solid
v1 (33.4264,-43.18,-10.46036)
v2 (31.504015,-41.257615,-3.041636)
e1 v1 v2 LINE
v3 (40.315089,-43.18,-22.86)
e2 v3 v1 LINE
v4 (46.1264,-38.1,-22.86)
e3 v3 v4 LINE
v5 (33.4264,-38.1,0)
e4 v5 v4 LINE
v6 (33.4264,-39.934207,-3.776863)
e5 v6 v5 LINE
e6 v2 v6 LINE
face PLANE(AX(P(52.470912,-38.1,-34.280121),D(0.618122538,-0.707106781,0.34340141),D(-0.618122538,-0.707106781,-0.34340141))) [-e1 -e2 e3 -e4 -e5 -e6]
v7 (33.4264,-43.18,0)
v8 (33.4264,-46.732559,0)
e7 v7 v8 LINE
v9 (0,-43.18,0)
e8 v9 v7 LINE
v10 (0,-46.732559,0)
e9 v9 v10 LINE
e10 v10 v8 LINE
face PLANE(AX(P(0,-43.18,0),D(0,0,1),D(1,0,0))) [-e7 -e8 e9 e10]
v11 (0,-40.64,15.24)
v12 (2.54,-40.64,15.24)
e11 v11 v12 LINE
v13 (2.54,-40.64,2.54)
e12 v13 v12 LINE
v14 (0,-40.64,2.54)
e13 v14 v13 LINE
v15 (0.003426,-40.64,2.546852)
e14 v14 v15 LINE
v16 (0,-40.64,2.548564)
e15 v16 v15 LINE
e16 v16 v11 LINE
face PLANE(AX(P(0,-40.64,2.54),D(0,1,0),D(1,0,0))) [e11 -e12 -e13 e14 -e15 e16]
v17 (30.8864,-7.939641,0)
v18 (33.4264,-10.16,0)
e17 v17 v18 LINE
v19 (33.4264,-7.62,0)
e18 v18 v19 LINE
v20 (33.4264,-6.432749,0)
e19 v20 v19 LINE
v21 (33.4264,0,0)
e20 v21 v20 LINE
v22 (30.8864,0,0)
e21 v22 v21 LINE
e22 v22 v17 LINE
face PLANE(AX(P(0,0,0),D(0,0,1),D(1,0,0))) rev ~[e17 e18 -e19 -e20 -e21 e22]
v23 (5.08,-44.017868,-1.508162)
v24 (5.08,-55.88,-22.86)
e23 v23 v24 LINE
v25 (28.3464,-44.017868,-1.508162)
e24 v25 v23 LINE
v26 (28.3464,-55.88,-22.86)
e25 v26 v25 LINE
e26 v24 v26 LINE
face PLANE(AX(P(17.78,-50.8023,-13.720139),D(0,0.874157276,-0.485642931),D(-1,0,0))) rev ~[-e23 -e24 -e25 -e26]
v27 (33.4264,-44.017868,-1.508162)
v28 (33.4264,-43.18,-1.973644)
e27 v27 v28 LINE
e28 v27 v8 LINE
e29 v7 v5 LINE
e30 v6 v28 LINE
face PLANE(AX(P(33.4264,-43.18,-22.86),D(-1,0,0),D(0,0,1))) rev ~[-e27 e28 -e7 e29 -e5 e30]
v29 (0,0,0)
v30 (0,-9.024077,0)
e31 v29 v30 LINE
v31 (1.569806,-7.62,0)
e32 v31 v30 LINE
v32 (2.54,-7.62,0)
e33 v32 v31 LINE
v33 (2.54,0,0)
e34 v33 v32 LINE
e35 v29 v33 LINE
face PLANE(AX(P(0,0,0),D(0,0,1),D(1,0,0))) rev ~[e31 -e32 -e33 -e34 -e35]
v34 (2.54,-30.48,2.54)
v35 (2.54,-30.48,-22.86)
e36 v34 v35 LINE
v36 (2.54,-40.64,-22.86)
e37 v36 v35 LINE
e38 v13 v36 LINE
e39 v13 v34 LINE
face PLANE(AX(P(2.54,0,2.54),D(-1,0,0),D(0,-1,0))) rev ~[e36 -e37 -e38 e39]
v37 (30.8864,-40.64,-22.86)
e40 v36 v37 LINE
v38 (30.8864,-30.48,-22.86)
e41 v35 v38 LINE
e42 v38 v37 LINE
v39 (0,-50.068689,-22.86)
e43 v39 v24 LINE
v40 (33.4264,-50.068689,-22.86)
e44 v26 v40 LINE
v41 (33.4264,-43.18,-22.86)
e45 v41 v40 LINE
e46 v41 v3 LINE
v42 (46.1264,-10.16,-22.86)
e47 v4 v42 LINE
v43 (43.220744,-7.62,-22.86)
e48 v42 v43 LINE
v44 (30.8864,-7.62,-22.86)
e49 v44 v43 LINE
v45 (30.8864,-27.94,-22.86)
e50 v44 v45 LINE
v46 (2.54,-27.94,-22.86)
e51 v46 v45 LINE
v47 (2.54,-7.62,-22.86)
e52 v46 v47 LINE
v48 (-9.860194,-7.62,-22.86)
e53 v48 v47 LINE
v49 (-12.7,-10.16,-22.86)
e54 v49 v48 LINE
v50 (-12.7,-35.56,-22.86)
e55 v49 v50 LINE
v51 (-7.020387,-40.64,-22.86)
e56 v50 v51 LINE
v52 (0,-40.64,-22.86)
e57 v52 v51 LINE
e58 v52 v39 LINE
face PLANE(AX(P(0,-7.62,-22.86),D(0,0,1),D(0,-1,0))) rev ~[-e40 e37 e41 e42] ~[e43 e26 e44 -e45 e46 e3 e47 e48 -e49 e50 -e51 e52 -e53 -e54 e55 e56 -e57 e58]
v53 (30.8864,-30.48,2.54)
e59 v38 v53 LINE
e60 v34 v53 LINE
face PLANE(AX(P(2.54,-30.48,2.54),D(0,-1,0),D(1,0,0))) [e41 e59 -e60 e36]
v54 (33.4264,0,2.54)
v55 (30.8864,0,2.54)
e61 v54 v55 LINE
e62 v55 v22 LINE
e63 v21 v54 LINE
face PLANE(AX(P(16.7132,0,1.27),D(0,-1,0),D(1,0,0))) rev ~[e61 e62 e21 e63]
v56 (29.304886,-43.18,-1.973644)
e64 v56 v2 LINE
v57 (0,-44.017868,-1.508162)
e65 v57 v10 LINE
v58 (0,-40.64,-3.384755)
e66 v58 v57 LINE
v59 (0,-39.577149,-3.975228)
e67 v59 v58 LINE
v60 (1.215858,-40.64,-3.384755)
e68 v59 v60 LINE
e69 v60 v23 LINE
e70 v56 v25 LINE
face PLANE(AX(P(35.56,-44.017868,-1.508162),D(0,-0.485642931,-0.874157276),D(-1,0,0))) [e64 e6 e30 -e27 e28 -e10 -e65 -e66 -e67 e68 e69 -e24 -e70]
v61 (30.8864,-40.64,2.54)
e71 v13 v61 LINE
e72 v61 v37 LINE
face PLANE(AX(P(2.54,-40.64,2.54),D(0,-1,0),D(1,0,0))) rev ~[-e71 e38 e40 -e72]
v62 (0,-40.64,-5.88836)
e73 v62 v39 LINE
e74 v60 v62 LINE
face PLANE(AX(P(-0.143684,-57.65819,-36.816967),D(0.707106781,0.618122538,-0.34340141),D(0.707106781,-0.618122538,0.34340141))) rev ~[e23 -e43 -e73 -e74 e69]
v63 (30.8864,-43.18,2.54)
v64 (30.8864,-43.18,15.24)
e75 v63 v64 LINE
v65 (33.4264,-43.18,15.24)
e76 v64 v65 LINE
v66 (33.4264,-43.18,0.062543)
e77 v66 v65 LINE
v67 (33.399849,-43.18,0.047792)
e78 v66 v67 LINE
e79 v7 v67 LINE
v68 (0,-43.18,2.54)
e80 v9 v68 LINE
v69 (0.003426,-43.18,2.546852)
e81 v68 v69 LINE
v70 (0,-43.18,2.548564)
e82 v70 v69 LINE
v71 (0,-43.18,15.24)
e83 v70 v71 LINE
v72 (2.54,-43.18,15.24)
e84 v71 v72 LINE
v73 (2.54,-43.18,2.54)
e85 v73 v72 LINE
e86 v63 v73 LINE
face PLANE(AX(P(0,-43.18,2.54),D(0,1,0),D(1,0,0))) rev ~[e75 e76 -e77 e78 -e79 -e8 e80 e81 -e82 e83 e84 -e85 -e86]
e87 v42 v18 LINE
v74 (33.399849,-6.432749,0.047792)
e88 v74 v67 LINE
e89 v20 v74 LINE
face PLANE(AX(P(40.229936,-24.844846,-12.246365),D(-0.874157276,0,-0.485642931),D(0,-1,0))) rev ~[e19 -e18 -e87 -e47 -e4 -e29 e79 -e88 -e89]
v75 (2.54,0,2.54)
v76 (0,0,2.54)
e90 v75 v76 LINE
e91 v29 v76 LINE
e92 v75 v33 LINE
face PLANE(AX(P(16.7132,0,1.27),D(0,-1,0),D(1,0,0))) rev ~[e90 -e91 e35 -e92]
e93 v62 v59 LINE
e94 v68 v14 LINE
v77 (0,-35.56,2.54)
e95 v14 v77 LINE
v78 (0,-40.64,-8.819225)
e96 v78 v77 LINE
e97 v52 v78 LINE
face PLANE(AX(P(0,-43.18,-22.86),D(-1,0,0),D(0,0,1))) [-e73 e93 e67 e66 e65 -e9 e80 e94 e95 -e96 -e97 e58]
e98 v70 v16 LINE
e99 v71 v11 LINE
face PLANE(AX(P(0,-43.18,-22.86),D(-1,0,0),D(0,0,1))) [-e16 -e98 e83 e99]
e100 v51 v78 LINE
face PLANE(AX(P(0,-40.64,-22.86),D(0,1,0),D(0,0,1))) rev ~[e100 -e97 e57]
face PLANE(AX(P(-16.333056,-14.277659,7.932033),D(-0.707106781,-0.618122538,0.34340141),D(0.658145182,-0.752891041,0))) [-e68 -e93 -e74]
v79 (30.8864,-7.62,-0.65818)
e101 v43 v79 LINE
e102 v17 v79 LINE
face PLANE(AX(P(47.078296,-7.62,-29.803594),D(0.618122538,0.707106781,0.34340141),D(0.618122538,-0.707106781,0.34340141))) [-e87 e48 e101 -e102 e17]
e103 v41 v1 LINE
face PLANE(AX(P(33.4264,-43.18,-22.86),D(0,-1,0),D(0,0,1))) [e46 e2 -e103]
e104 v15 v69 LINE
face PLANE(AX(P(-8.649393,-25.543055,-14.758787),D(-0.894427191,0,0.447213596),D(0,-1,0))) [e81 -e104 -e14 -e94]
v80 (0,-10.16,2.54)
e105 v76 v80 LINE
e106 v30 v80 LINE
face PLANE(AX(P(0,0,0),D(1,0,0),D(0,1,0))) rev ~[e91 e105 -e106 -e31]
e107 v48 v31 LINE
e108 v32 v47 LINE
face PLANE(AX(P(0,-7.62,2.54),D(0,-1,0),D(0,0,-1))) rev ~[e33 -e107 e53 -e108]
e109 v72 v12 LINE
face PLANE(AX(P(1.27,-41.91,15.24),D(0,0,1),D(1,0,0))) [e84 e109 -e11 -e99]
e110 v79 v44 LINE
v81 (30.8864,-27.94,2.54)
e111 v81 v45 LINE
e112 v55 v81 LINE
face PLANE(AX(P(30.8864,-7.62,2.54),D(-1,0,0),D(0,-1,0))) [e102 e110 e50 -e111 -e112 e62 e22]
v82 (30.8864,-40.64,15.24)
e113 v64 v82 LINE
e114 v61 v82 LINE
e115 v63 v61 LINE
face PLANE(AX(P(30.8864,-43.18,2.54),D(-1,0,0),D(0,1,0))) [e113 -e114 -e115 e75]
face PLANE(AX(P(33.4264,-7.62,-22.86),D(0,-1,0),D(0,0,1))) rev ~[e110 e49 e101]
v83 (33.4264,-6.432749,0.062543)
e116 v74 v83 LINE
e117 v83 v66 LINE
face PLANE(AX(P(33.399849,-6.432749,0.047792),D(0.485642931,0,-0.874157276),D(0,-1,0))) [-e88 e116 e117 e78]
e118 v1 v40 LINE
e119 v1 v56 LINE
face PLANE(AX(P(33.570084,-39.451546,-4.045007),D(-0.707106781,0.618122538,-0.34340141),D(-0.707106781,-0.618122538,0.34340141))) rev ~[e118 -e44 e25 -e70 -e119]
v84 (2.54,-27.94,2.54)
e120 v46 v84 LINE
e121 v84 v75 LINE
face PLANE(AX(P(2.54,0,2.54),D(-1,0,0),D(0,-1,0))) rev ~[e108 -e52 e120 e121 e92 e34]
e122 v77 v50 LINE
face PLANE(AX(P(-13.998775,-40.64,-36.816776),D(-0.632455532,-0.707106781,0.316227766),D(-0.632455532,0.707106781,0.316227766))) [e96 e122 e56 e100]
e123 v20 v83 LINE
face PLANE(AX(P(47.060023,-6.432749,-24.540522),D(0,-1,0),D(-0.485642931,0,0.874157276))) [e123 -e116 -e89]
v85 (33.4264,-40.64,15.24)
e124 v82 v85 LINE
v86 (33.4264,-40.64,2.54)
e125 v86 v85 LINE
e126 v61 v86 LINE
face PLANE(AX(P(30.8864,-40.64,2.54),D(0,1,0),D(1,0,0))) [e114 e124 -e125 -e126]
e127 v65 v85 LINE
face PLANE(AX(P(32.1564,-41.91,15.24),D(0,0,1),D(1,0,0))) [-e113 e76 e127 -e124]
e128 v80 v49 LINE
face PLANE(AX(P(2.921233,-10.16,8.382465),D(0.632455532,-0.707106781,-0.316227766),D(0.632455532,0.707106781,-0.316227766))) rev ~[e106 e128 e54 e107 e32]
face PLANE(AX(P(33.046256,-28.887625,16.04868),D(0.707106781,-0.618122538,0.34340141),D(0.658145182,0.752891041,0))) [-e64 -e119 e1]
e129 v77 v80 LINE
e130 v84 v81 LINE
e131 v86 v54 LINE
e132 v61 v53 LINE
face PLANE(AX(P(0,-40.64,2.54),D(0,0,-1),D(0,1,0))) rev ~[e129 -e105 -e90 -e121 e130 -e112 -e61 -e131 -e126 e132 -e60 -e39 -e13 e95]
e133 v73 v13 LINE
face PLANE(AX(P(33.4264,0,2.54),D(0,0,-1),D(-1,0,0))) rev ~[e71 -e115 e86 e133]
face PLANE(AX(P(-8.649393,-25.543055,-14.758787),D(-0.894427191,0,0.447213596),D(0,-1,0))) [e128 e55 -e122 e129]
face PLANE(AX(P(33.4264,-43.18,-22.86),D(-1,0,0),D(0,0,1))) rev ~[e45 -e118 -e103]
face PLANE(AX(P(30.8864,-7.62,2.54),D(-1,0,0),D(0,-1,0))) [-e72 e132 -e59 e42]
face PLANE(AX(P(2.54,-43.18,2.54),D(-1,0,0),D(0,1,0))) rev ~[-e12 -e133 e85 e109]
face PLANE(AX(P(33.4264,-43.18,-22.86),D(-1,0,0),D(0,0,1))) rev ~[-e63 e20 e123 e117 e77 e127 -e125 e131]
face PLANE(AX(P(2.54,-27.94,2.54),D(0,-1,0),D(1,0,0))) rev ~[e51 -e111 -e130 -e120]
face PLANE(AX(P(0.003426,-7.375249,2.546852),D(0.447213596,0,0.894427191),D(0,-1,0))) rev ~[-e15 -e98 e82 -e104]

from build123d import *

# Parameters (mm, degrees)
F0_W          = 28.3464
F0_H          = 2.54
F0_W_2        = 2.54
F1_DEPTH      = 43.18
F2_W          = 28.3464
F2_H          = 10.16
F3_DEPTH      = 2.54
F2_W_2        = 2.54
F2_H_2        = 2.54
F4_DEPTH      = 12.7
F5_DEPTH      = 25.4
F6_W          = 33.4264
F6_H          = 22.86
F7_DEPTH      = 12.7
F9_W          = 35.56
F9_H          = 27.94
F10_DEPTH     = 25.4
F11_W         = 35.56
F11_H         = 22.86
F12_DEPTH     = 12.7
F14_W         = 36.8241928518
F14_H         = 28.1280204654
F15_DEPTH     = 25.4
F17_DEPTH     = 12.7
F19_W         = 36.3356121816
F19_H         = 38.6965835933
F20_DEPTH     = 25.4
F21_T4_DEPTH  = 37.4897748093
F21_T10_DEPTH = 37.4897748093
F22_T4_DEPTH  = 41.4622128931
F22_T9_DEPTH  = 41.4622128931
F22_T15_DEPTH = 39.215050137
F22_T21_DEPTH = 39.215050137
F22_T26_DEPTH = 13.1188216118
F23_T4_DEPTH  = 41.4622128931
F23_T9_DEPTH  = 41.4622128931
F23_T14_DEPTH = 39.215050137
F24_W         = 28.3464
F24_H         = 2.54
F25_DEPTH     = 25.4


# Not quite as in the source:
# - a fillet or chamfer that OpenCascade refuses, or shapes differently, is made with other operations: its cross-section is extruded or revolved along the edge and cut away or added


with BuildPart() as f1:
    # F0 (on Front) → F1 (new body)
    with BuildSketch(Plane.XZ):
        with Locations((16.7132, 1.27)):
            Rectangle(F0_W, F0_H)
        with Locations((1.27, 1.27)):
            Rectangle(F0_W_2, F0_H)
        with Locations((32.1564, 1.27)):
            Rectangle(F0_W_2, F0_H)
    extrude(amount=F1_DEPTH)

    # F2 (on face) → F3 (cut)
    with BuildSketch(Plane.XY.offset(2.54)):
        Polygon((30.8864, 0), (2.54, 0), (2.54, -7.62), (2.54, -27.94), (30.8864, -27.94), (30.8864, -7.62), align=None)
        with Locations((16.7132, -35.56)):
            Rectangle(F2_W, F2_H)
    extrude(amount=-F3_DEPTH, mode=Mode.SUBTRACT)

    # F2 (on face) → F4 (join)
    with BuildSketch(Plane.XY.offset(2.54)):
        with Locations((1.27, -41.91)):
            Rectangle(F2_W_2, F2_H_2)
        with Locations((32.1564, -41.91)):
            Rectangle(F2_W_2, F2_H_2)
    extrude(amount=F4_DEPTH)

    # F2 (on face) → F5 (join)
    with BuildSketch(Plane.XY.offset(2.54)):
        Polygon((2.54, -7.62), (0, -7.62), (0, -40.64), (2.54, -40.64), (2.54, -30.48), (2.54, -27.94), align=None)
        Polygon((33.4264, -7.62), (30.8864, -7.62), (30.8864, -27.94), (30.8864, -30.48), (30.8864, -40.64), (33.4264, -40.64), align=None)
        with Locations((16.7132, -41.91)):
            Rectangle(F2_W, F2_H_2)
        with Locations((1.27, -41.91)):
            Rectangle(F2_W_2, F2_H_2)
        with Locations((32.1564, -41.91)):
            Rectangle(F2_W_2, F2_H_2)
    extrude(amount=-F5_DEPTH)

    # F6 (on face) → F7 (join)
    with BuildSketch(Plane.XZ.offset(43.18)):
        with Locations((16.7132, -11.43)):
            Rectangle(F6_W, F6_H)
    extrude(amount=F7_DEPTH)

    # F9 (on 3pt) → F10 (cut)
    with BuildSketch(Plane(origin=(0, -32.9960377358, 18.3311320755), x_dir=(-1, 0, 0), z_dir=(0, 0.8741572761, -0.4856429312))):
        with Locations((-17.78, -36.665337096)):
            Rectangle(F9_W, F9_H)
    extrude(amount=-F10_DEPTH, mode=Mode.SUBTRACT)

    # F11 (on face) → F12 (join)
    with BuildSketch(Plane.YZ.offset(33.4264)):
        with Locations((-25.4, -11.43)):
            Rectangle(F11_W, F11_H)
    extrude(amount=F12_DEPTH)

    # F14 (on 3pt) → F15 (cut)
    with BuildSketch(Plane(origin=(25.5428150943, 0, 14.1904528302), x_dir=(0, -1, 0), z_dir=(-0.8741572761, 0, -0.4856429312))):
        with Locations((24.8448457569, -30.2426330745)):
            Rectangle(F14_W, F14_H)
    extrude(amount=-F15_DEPTH, mode=Mode.SUBTRACT)

    # F16 (on face) → F17 (join)
    with BuildSketch(Plane(origin=(0, 0, 0), x_dir=(0, -1, 0), z_dir=(-1, 0, 0))):
        Polygon((40.64, -22.86), (40.64, 2.54), (7.62, 2.54), (7.62, 0), (7.62, -22.86), align=None)
    extrude(amount=F17_DEPTH)

    # F19 (on 3pt) → F20 (cut)
    with BuildSketch(Plane(origin=(-1.016, 0, 0.508), x_dir=(0, -1, 0), z_dir=(-0.894427191, 0, 0.4472135955))):
        with Locations((25.5430552643, -17.0687864302)):
            Rectangle(F19_W, F19_H)
    extrude(amount=F20_DEPTH, mode=Mode.SUBTRACT)

    # F21: chamfer of 5.08 on 2 edges, made by hand


with BuildPart() as f21_tool2:
    # F21_s3 → F21_t4 (new body)
    with BuildSketch(Plane(origin=(0, -29.228474159, -52.6112534862), x_dir=(1, 0, 0), z_dir=(0, 0.4856429312, 0.8741572761))):
        with BuildLine():
            Line((-0.1436840979, -32.522427085), (5.2236840979, -37.8897952809))
            Line((5.2236840979, -37.8897952809), (5.2236840979, -37.9913952809))
            ThreePointArc((5.2236840979, -37.9913952809), (2.611842049, -37.8477111829), (0, -37.8477111829))
            Line((0, -37.8477111829), (-0.1016, -37.7461111829))
            ThreePointArc((-0.1016, -37.7461111829), (-0.1016, -35.134269134), (-0.2452840979, -32.522427085))
            Line((-0.2452840979, -32.522427085), (-0.1436840979, -32.522427085))
        make_face()
    extrude(amount=F21_T4_DEPTH)

    split(bisect_by=Plane.XY.offset(-22.86), keep=Keep.TOP)

    split(bisect_by=Plane.XZ.offset(40.64), keep=Keep.TOP)


with BuildPart() as f1_1:
    add(f1.part)

    # F21_t1: cut F21_tool2
    add(f21_tool2.part, mode=Mode.SUBTRACT)


with BuildPart() as f21_tool8:
    # F21_s9 → F21_t10 (new body)
    with BuildSketch(Plane(origin=(0, -11.0218300314, -19.8392940565), x_dir=(1, 0, 0), z_dir=(0, -0.4856429312, -0.8741572761))):
        with BuildLine():
            Line((33.5700840979, 32.522427085), (28.2027159021, 37.8897952809))
            Line((28.2027159021, 37.8897952809), (28.2027159021, 37.9913952809))
            ThreePointArc((28.2027159021, 37.9913952809), (30.814557951, 37.8477111829), (33.4264, 37.8477111829))
            Line((33.4264, 37.8477111829), (33.528, 37.7461111829))
            ThreePointArc((33.528, 37.7461111829), (33.528, 35.134269134), (33.6716840979, 32.522427085))
            Line((33.6716840979, 32.522427085), (33.5700840979, 32.522427085))
        make_face()
    extrude(amount=F21_T10_DEPTH)

    split(bisect_by=Plane.XZ.offset(43.18), keep=Keep.TOP)

    split(bisect_by=Plane.XY.offset(-22.86), keep=Keep.TOP)


with BuildPart() as f1_2:
    add(f1_1.part)

    # F21_t7: cut F21_tool8
    add(f21_tool8.part, mode=Mode.SUBTRACT)

    # F22: chamfer of 5.08 on 2 edges, made by hand


with BuildPart() as f22_tool2:
    # F22_s3 → F22_t4 (new body)
    with BuildSketch(Plane(origin=(-17.5264653053, 0, -35.0529306106), x_dir=(0, 1, 0), z_dir=(0.4472135955, 0, 0.894427191))):
        Polygon((-40.64, -3.9440774674), (-35.56, 1.1359225326), (-40.64, 1.1359225326), align=None)
    extrude(amount=F22_T4_DEPTH)

    split(bisect_by=Plane.YZ, keep=Keep.BOTTOM)


with BuildPart() as f1_3:
    add(f1_2.part)

    # F22_t1: cut F22_tool2
    add(f22_tool2.part, mode=Mode.SUBTRACT)


with BuildPart() as f22_tool7:
    # F22_s8 → F22_t9 (new body)
    with BuildSketch(Plane(origin=(-17.5264653053, 0, -35.0529306106), x_dir=(0, 1, 0), z_dir=(0.4472135955, 0, 0.894427191))):
        Polygon((-40.64, -3.9440774674), (-35.56, 1.1359225326), (-40.64, 1.1359225326), align=None)
    extrude(amount=F22_T9_DEPTH)

    split(bisect_by=Plane(origin=(-16.3330555915, -14.2776593863, 7.9320329924), x_dir=(0.6581451817, -0.7528910411, 0), z_dir=(-0.7071067812, -0.6181225378, 0.3434014099)), keep=Keep.TOP)

    split(bisect_by=Plane(origin=(0, -11.0218300314, -19.8392940565), x_dir=(1, 0, 0), z_dir=(0, -0.4856429312, -0.8741572761)), keep=Keep.TOP)


with BuildPart() as f1_4:
    add(f1_3.part)

    # F22_t6: cut F22_tool7
    add(f22_tool7.part, mode=Mode.SUBTRACT)


with BuildPart() as f22_tool13:
    # F22_s14 → F22_t15 (new body)
    with BuildSketch(Plane(origin=(26.9280968005, 0, -48.4705742409), x_dir=(0, 1, 0), z_dir=(-0.4856429312, 0, 0.8741572761))):
        Polygon((-38.1, -29.2199307745), (-43.18, -24.1399307745), (-43.18, -29.2199307745), align=None)
    extrude(amount=F22_T15_DEPTH)

    split(bisect_by=Plane(origin=(33.0462555918, -28.8876247736, 16.0486804298), x_dir=(0.6581451817, 0.7528910411, 0), z_dir=(0.7071067812, -0.6181225378, 0.3434014099)), keep=Keep.TOP)

    split(bisect_by=Plane(origin=(0, -11.0218300314, -19.8392940565), x_dir=(1, 0, 0), z_dir=(0, -0.4856429312, -0.8741572761)), keep=Keep.TOP)


with BuildPart() as f1_5:
    add(f1_4.part)

    # F22_t12: cut F22_tool13
    add(f22_tool13.part, mode=Mode.SUBTRACT)


with BuildPart() as f22_tool19:
    # F22_s20 → F22_t21 (new body)
    with BuildSketch(Plane(origin=(26.9280968005, 0, -48.4705742409), x_dir=(0, 1, 0), z_dir=(-0.4856429312, 0, 0.8741572761))):
        Polygon((-38.1, -29.2199307745), (-43.18, -24.1399307745), (-43.18, -29.2199307745), align=None)
    extrude(amount=F22_T21_DEPTH)

    split(bisect_by=Plane.YZ.offset(33.4264), keep=Keep.TOP)


with BuildPart() as f1_6:
    add(f1_5.part)

    # F22_t18: cut F22_tool19
    add(f22_tool19.part, mode=Mode.SUBTRACT)


with BuildPart() as f22_tool24:
    # F22_s25 → F22_t26 (new body)
    with BuildSketch(Plane(origin=(1.5125219245, 0, -2.7225394641), x_dir=(0, 1, 0), z_dir=(0.4856429312, 0, -0.8741572761))):
        Polygon((-38.1, 29.2199307745), (-43.18, 24.1399307745), (-43.18, 29.2199307745), align=None)
    extrude(amount=F22_T26_DEPTH)

    split(bisect_by=Plane(origin=(33.0462555918, -28.8876247736, 16.0486804298), x_dir=(0.6581451817, 0.7528910411, 0), z_dir=(0.7071067812, -0.6181225378, 0.3434014099)), keep=Keep.TOP)

    split(bisect_by=Plane(origin=(0, -11.0218300314, -19.8392940565), x_dir=(1, 0, 0), z_dir=(0, -0.4856429312, -0.8741572761)), keep=Keep.TOP)


with BuildPart() as f1_7:
    add(f1_6.part)

    # F22_t23: cut F22_tool24
    add(f22_tool24.part, mode=Mode.SUBTRACT)

    # F23: chamfer of 2.54 on 2 edges, made by hand


with BuildPart() as f23_tool2:
    # F23_s3 → F23_t4 (new body)
    with BuildSketch(Plane(origin=(3.9372326527, 0, 7.8744653053), x_dir=(0, 1, 0), z_dir=(-0.4472135955, 0, -0.894427191))):
        Polygon((-10.16, -1.1359225326), (-7.62, 1.4040774674), (-7.62, -1.1359225326), align=None)
    extrude(amount=F23_T4_DEPTH)

    split(bisect_by=Plane.XY, keep=Keep.BOTTOM)


with BuildPart() as f1_8:
    add(f1_7.part)

    # F23_t1: cut F23_tool2
    add(f23_tool2.part, mode=Mode.SUBTRACT)


with BuildPart() as f23_tool7:
    # F23_s8 → F23_t9 (new body)
    with BuildSketch(Plane(origin=(3.9372326527, 0, 7.8744653053), x_dir=(0, 1, 0), z_dir=(-0.4472135955, 0, -0.894427191))):
        Polygon((-10.16, -1.1359225326), (-7.62, 1.4040774674), (-7.62, -1.1359225326), align=None)
    extrude(amount=F23_T9_DEPTH)

    split(bisect_by=Plane.YZ, keep=Keep.BOTTOM)


with BuildPart() as f1_9:
    add(f1_8.part)

    # F23_t6: cut F23_tool7
    add(f23_tool7.part, mode=Mode.SUBTRACT)


with BuildPart() as f23_tool12:
    # F23_s13 → F23_t14 (new body)
    with BuildSketch(Plane(origin=(23.7558408531, 0, -42.7605135355), x_dir=(0, 1, 0), z_dir=(-0.4856429312, 0, 0.8741572761))):
        Polygon((-7.62, -26.6799307745), (-10.16, -29.2199307745), (-7.62, -29.2199307745), align=None)
    extrude(amount=F23_T14_DEPTH)

    split(bisect_by=Plane.XY, keep=Keep.BOTTOM)


with BuildPart() as f1_10:
    add(f1_9.part)

    # F23_t11: cut F23_tool12
    add(f23_tool12.part, mode=Mode.SUBTRACT)

    # F24 (on face) → F25 (join)
    with BuildSketch(Plane.XY.offset(2.54)):
        with Locations((16.7132, -29.21)):
            Rectangle(F24_W, F24_H)
    extrude(amount=-F25_DEPTH)


solid = f1_10.part
